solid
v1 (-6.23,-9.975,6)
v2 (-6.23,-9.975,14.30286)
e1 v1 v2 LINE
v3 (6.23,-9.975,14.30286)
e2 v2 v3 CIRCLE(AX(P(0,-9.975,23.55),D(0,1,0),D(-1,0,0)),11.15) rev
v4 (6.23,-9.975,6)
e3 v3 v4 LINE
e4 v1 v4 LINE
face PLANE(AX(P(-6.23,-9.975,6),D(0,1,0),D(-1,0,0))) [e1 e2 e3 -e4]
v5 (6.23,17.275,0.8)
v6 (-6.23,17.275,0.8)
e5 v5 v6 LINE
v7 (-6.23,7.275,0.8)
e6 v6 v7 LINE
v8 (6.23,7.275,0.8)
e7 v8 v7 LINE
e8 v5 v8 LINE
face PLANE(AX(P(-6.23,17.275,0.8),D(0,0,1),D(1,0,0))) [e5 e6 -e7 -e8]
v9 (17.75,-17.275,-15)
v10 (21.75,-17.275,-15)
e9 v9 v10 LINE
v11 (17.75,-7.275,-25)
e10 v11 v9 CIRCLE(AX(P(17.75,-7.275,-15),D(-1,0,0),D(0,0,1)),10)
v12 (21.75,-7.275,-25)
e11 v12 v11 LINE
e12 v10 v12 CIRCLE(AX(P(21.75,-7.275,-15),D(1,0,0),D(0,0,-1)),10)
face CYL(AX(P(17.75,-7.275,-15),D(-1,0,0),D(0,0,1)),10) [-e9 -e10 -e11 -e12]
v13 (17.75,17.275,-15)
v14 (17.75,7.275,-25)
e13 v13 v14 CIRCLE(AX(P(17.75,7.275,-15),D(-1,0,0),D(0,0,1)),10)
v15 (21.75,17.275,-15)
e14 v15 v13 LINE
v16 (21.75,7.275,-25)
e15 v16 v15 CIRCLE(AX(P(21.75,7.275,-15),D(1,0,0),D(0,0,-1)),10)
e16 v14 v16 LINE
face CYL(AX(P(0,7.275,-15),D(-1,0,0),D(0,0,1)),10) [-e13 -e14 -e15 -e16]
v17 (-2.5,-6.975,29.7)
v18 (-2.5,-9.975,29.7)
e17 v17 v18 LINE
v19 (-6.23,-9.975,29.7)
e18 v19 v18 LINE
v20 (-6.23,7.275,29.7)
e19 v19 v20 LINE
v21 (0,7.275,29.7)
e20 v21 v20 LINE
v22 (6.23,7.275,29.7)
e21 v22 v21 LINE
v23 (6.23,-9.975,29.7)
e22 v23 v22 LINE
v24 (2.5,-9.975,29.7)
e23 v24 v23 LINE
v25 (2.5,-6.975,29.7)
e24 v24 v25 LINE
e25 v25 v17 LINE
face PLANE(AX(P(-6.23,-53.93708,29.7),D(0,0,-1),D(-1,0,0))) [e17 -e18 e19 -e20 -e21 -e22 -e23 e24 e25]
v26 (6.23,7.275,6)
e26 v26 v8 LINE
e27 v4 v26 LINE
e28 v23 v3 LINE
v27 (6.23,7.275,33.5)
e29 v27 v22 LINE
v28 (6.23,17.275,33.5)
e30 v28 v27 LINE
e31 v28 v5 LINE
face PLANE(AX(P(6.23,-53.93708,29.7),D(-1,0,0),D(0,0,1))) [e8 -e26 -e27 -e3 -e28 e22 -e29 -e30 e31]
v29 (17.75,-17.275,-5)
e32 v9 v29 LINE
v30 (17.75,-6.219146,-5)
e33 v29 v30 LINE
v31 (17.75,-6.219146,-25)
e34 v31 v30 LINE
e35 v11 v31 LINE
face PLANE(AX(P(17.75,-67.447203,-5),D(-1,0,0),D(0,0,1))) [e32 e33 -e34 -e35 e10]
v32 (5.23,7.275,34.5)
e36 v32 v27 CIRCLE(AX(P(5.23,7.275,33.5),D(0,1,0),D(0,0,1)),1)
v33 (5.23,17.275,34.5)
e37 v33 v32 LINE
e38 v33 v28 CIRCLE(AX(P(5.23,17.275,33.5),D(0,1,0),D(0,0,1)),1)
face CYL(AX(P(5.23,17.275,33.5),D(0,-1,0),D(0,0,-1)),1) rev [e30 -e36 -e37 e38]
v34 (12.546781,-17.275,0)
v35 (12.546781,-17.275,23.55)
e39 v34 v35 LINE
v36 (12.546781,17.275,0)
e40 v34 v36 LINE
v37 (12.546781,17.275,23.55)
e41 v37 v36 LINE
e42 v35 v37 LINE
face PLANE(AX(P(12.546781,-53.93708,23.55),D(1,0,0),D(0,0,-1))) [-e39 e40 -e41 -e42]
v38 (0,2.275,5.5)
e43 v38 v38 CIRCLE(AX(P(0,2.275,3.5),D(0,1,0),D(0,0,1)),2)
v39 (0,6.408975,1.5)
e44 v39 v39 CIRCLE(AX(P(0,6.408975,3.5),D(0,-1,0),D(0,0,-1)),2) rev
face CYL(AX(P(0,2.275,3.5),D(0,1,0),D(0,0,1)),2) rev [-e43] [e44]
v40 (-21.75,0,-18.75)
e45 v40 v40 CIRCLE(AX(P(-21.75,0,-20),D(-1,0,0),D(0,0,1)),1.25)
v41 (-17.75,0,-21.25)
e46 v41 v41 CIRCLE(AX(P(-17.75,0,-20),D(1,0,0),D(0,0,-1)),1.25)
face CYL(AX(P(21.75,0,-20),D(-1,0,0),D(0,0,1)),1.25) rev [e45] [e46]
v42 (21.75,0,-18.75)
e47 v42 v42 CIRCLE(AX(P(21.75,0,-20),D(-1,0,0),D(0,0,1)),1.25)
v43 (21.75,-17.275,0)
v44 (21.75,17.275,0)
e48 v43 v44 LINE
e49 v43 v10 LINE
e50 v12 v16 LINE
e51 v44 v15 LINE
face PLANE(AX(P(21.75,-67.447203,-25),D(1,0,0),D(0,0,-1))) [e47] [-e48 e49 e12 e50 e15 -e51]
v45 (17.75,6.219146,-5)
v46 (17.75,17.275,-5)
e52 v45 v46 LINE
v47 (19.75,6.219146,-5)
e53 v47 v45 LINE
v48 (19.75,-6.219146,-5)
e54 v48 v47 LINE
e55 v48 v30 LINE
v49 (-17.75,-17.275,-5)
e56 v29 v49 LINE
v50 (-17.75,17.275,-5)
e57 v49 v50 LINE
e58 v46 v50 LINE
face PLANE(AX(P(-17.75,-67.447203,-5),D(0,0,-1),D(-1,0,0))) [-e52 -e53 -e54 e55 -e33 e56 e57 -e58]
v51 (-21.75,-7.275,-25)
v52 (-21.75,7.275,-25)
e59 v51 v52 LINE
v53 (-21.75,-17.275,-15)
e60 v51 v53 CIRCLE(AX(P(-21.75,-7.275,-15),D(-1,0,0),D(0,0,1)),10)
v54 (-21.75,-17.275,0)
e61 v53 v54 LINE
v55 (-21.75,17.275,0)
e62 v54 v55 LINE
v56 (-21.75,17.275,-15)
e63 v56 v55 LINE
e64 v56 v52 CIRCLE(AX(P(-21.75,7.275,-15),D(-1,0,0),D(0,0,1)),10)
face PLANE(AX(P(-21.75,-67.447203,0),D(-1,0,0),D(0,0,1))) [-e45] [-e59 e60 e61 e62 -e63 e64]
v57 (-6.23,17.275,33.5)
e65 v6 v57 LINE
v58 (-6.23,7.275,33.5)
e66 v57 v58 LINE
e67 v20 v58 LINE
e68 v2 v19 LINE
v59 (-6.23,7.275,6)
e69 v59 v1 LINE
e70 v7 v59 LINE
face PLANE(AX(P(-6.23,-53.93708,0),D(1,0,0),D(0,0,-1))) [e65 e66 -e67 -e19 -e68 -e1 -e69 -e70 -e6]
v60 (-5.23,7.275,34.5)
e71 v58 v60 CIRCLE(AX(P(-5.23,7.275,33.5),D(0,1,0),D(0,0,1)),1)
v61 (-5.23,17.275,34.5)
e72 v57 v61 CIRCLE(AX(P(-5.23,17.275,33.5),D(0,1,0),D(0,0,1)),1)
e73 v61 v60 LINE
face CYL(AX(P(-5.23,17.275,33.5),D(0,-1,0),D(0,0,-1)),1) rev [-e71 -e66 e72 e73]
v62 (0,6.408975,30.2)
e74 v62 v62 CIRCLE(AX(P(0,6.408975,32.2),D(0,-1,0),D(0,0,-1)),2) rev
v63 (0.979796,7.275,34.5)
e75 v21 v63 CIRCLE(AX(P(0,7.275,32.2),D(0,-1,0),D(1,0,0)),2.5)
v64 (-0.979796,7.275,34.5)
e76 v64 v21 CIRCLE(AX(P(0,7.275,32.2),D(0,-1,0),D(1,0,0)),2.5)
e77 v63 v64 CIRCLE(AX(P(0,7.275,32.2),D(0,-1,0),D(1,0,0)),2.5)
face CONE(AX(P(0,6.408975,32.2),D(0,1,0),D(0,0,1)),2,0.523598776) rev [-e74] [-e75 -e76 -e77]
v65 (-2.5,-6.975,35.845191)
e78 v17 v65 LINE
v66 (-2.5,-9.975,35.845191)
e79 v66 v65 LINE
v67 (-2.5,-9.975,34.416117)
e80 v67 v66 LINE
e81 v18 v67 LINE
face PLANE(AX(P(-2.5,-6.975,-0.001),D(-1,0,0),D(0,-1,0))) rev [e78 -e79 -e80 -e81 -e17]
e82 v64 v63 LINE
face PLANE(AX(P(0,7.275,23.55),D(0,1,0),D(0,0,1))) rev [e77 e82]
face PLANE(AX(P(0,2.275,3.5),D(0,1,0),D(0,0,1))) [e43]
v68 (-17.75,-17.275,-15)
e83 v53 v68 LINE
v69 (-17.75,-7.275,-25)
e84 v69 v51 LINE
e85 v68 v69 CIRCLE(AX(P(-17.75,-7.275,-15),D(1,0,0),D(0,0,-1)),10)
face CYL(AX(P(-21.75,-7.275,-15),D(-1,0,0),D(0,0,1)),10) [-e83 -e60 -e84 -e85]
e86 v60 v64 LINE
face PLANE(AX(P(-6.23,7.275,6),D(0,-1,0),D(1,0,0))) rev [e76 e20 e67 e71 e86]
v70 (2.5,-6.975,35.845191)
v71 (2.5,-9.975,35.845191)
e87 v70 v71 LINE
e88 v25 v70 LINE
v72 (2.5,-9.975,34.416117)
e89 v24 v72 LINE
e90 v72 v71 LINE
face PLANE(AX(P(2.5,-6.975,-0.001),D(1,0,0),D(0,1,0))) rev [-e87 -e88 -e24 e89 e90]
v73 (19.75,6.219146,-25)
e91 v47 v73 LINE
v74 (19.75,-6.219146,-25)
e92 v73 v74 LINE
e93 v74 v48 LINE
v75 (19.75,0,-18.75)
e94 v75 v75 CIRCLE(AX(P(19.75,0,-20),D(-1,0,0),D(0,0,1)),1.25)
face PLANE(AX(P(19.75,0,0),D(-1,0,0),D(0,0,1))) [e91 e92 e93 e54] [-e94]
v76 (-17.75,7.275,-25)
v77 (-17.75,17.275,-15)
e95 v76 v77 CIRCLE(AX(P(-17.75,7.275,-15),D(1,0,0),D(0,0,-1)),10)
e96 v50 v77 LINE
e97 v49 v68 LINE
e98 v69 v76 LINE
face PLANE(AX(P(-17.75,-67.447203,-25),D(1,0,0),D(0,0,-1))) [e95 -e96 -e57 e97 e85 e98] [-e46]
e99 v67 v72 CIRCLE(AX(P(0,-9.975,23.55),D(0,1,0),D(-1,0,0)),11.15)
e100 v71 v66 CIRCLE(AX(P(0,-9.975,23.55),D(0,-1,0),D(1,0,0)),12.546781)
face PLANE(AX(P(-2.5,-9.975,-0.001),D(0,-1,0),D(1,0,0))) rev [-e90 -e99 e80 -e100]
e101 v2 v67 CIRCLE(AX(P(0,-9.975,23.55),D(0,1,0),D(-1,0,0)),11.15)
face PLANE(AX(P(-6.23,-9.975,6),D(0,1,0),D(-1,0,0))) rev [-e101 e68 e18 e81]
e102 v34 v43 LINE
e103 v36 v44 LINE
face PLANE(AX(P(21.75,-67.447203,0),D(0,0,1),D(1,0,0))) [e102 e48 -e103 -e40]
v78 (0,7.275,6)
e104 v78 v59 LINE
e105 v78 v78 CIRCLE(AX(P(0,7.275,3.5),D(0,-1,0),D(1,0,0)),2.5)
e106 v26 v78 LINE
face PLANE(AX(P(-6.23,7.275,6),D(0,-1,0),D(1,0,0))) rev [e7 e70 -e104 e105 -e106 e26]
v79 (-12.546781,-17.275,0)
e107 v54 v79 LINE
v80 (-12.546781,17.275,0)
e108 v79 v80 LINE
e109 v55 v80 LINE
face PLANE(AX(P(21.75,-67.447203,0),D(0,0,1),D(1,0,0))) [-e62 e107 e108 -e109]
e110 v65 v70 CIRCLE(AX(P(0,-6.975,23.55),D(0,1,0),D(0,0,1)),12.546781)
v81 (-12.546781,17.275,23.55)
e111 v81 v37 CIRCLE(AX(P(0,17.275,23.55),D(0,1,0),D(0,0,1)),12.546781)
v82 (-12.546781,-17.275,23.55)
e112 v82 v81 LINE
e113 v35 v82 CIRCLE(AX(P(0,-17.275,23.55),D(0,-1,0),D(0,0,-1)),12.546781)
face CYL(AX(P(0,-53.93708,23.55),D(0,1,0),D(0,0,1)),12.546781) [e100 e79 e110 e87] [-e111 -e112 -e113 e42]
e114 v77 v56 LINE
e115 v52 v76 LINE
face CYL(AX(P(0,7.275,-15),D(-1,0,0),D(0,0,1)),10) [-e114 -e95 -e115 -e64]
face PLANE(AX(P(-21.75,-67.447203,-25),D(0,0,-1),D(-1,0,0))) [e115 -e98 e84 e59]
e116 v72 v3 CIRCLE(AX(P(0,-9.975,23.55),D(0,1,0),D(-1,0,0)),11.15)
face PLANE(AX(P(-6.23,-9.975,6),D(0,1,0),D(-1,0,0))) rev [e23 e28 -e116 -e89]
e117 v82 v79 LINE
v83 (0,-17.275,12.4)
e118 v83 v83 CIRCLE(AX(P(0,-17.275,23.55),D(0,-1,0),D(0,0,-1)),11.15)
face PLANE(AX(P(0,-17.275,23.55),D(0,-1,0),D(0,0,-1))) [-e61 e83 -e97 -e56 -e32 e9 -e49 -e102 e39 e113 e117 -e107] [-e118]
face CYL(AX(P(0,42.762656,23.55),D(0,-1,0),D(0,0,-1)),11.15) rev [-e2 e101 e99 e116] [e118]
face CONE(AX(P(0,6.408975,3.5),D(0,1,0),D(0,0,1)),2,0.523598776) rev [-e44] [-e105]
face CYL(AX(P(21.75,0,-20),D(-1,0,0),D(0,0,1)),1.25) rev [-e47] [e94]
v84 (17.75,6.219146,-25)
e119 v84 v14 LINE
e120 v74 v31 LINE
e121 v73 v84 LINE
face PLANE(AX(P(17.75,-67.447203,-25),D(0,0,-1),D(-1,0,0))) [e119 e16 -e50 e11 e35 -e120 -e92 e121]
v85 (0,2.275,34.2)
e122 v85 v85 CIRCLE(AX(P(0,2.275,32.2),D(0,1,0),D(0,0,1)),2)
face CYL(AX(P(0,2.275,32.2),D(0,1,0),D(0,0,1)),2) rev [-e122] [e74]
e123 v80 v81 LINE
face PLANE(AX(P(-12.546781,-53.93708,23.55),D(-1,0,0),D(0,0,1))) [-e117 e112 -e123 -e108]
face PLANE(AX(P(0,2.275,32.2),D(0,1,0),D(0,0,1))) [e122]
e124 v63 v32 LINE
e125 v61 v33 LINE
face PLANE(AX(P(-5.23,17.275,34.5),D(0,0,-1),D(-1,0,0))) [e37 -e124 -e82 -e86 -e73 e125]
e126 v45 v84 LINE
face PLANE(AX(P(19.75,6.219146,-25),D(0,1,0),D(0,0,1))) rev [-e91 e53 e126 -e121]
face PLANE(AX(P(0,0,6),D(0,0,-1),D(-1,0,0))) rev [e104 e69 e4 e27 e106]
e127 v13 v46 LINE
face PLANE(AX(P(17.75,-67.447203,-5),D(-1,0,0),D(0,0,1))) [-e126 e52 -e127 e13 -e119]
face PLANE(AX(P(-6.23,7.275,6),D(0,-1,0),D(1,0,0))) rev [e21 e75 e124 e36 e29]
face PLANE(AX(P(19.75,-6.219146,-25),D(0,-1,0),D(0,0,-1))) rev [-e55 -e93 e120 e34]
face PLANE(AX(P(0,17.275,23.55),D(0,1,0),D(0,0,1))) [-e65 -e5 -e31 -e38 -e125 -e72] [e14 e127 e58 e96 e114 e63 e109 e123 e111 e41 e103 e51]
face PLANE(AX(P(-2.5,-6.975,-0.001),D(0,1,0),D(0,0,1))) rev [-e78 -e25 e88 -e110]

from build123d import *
from OCP.BRepFilletAPI import BRepFilletAPI_MakeChamfer

# Parameters (mm, degrees)
SKETCH4_W                = 12.46
SKETCH4_H                = 17.25
BOSS_EXTRUDE3_DEPTH      = 6
BOSS_EXTRUDE6_DEPTH      = 7.3
BOSS_EXTRUDE6_DEPTH_BACK = 17.25
SKETCH8_R                = 12.546781182
SKETCH8_R_2              = 11.15
BOSS_EXTRUDE4_DEPTH      = 17.25
SKETCH6_R                = 2
CUT_EXTRUDE1_DEPTH       = 5
CHAMFER1_SIZE            = 0.5
CHAMFER1_SIZE_2          = 0.866025404
SKETCH10_W               = 12.46
SKETCH10_H               = 23.7
CUT_EXTRUDE3_DEPTH       = 17.25
CUT_EXTRUDE4_REACH       = 43.938
SKETCH11_W               = 5
SKETCH11_H               = 3
BOSS_EXTRUDE7_START      = -7.3
BOSS_EXTRUDE7_DEPTH      = 7.3
BOSS_EXTRUDE9_START      = 10
BOSS_EXTRUDE9_DEPTH      = 10
BOSS_EXTRUDE10_DEPTH     = 34.55
SKETCH18_W               = 20
SKETCH18_H               = 12.438292938
CUT_EXTRUDE5_DEPTH       = 2
CUT_EXTRUDE6_DEPTH       = 58.651133872
CUT_EXTRUDE6_DEPTH_BACK  = 58.651133872
SKETCH19_R               = 1.25
FILLET1_R                = 10


with BuildPart() as part:
    # Sketch4 → Boss-Extrude3 (new body)
    with BuildSketch(Plane.XY):
        with Locations((0, -1.35)):
            Rectangle(SKETCH4_W, SKETCH4_H)
    extrude(amount=BOSS_EXTRUDE3_DEPTH)



with BuildPart() as body_2:
    # Sketch8 → Boss-Extrude6 (new, two sides: drawn at the far end of the back side and taken through both)
    with BuildSketch(Plane(origin=(0, -9.975, 0), x_dir=(-1, 0, 0), z_dir=(0, -1, 0)).offset(-BOSS_EXTRUDE6_DEPTH_BACK)):
        with Locations(Location((0, -23.55, 0), (0, 0, 90))):
            Circle(SKETCH8_R)
        with Locations(Location((0, -23.55, 0), (0, 0, 90))):
            Circle(SKETCH8_R_2, mode=Mode.SUBTRACT)
    extrude(amount=BOSS_EXTRUDE6_DEPTH + BOSS_EXTRUDE6_DEPTH_BACK)


with BuildPart() as part_1:
    add(part.part)

    add(body_2.part)  # Boss-Extrude4 merges body 2
    # Sketch5 → Boss-Extrude4 (add)
    with BuildSketch(Plane(origin=(0, 7.275, 0), x_dir=(1, 0, 0), z_dir=(0, 1, 0))):
        with BuildLine():
            Line((12.546781182, -23.55), (12.546781182, 0))
            Line((12.546781182, 0), (6.23, 0))
            Line((6.23, 0), (6.23, -29.7))
            Line((6.23, -29.7), (-6.23, -29.7))
            Line((-6.23, -29.7), (-6.23, 0))
            Line((-6.23, 0), (-12.546781182, 0))
            Line((-12.546781182, 0), (-12.546781182, -23.55))
            ThreePointArc((-12.546781182, -23.55), (0, -36.096781182), (12.546781182, -23.55))
        make_face()
    extrude(amount=-BOSS_EXTRUDE4_DEPTH)

    # Sketch6 → Cut-Extrude1 (cut)
    with BuildSketch(Plane(origin=(0, 7.275, 0), x_dir=(1, 0, 0), z_dir=(0, 1, 0))):
        with Locations(Location((0, -3.5, 0), (0, 0, 270))):
            Circle(SKETCH6_R)
        with Locations(Location((0, -32.2, 0), (0, 0, 270))):
            Circle(SKETCH6_R)
    extrude(amount=-CUT_EXTRUDE1_DEPTH, mode=Mode.SUBTRACT)

    # Chamfer1
    chamfer1_edges_1 = [part_1.edges().sort_by_distance(p)[0] for p in [
        (0, 7.275, 1.5),
    ]]
    chamfer1_side_1 = [part_1.faces().sort_by_distance(p)[0] for p in [
        (0, 7.275, 1.49),
    ]]
    chamfer1_edges_2 = [part_1.edges().sort_by_distance(p)[0] for p in [
        (0, 7.275, 30.2),
    ]]
    chamfer1_side_2 = [part_1.faces().sort_by_distance(p)[0] for p in [
        (0, 7.275, 30.19),
    ]]
    chamfer1 = BRepFilletAPI_MakeChamfer(part_1.part.solid().wrapped)
    for e in chamfer1_edges_1:
        chamfer1.Add(CHAMFER1_SIZE - 0.0001, CHAMFER1_SIZE_2 - 0.0001, e.wrapped, chamfer1_side_1[0].wrapped)
    for e in chamfer1_edges_2:
        chamfer1.Add(CHAMFER1_SIZE - 0.0001, CHAMFER1_SIZE_2 - 0.0001, e.wrapped, chamfer1_side_2[0].wrapped)
    add(Compound.cast(chamfer1.Shape()), mode=Mode.REPLACE)  # a hair under: the kernel refuses the full size

    # Sketch10 → Cut-Extrude3 (cut)
    with BuildSketch(Plane(origin=(0, 7.275, 0), x_dir=(1, 0, 0), z_dir=(0, 1, 0))):
        with Locations((0, -17.85)):
            Rectangle(SKETCH10_W, SKETCH10_H)
    extrude(amount=-CUT_EXTRUDE3_DEPTH, mode=Mode.SUBTRACT)

    # Sketch11 → Cut-Extrude4 (cut, up to next)
    with BuildSketch(Plane.XY.offset(36.096781182), mode=Mode.PRIVATE) as cut_extrude4_sk1:
        with Locations((0, -8.475)):
            Rectangle(SKETCH11_W, SKETCH11_H)
    cut_extrude4_tool1 = extrude(cut_extrude4_sk1.sketch, amount=-CUT_EXTRUDE4_REACH, mode=Mode.PRIVATE) & part_1.part
    add(cut_extrude4_tool1.solids().sort_by_distance((0, -8.475, 36.096781))[0], mode=Mode.SUBTRACT)

    # Sketch13 → Boss-Extrude7 (add)
    with BuildSketch(Plane.XZ.offset(17.275).offset(BOSS_EXTRUDE7_START)):
        with BuildLine():
            Line((-12.546781182, 23.55), (-12.546781182, 0))
            Line((-12.546781182, 0), (12.546781182, 0))
            Line((12.546781182, 0), (12.546781182, 23.55))
            ThreePointArc((12.546781182, 23.55), (0, 11.003218818), (-12.546781182, 23.55))
        make_face()
    extrude(amount=BOSS_EXTRUDE7_DEPTH)

    # Sketch15 → Boss-Extrude9 (add)
    with BuildSketch(Plane(origin=(0, 7.275, 0), x_dir=(1, 0, 0), z_dir=(0, 1, 0)).offset(BOSS_EXTRUDE9_START)):
        with BuildLine():
            Line((-12.546781182, 0), (12.546781182, 0))
            Line((12.546781182, 0), (12.546781182, -23.55))
            ThreePointArc((12.546781182, -23.55), (0, -36.096781182), (-12.546781182, -23.55))
            Line((-12.546781182, -23.55), (-12.546781182, 0))
        make_face()
        with BuildLine():
            Line((-6.23, -0.8), (6.23, -0.8))
            Line((6.23, -0.8), (6.23, -33.5))
            ThreePointArc((6.23, -33.5), (5.937106781, -34.207106781), (5.23, -34.5))
            Line((5.23, -34.5), (-5.23, -34.5))
            ThreePointArc((-5.23, -34.5), (-5.937106781, -34.207106781), (-6.23, -33.5))
            Line((-6.23, -33.5), (-6.23, -0.8))
        make_face(mode=Mode.SUBTRACT)
    extrude(amount=-BOSS_EXTRUDE9_DEPTH)

    # Sketch17 → Boss-Extrude10 (add)
    with BuildSketch(Plane(origin=(0, 17.275, 0), x_dir=(1, 0, 0), z_dir=(0, 1, 0))):
        Polygon((21.75, 25), (21.75, 0), (-21.75, 0), (-21.75, 25), (-17.75, 25), (-17.75, 5), (17.75, 5), (17.75, 25), align=None)
    extrude(amount=-BOSS_EXTRUDE10_DEPTH)

    # Sketch18 → Cut-Extrude5 (cut)
    with BuildSketch(Plane.ZY.offset(-17.75)):
        with Locations((-15, 0)):
            Rectangle(SKETCH18_W, SKETCH18_H)
    extrude(amount=-CUT_EXTRUDE5_DEPTH, mode=Mode.SUBTRACT)

    # Sketch19 → Cut-Extrude6 (cut, two sides: drawn at the far end of the back side and taken through both)
    with BuildSketch(Plane.ZY.offset(-19.75).offset(-CUT_EXTRUDE6_DEPTH_BACK)):
        with Locations((-20, 0)):
            Circle(SKETCH19_R)
    extrude(amount=CUT_EXTRUDE6_DEPTH + CUT_EXTRUDE6_DEPTH_BACK, mode=Mode.SUBTRACT)

    # Fillet1
    fillet1_edges = [part_1.edges().sort_by_distance(p)[0] for p in [
        (19.75, 17.275, -25),
        (-19.75, 17.275, -25),
        (-19.75, -17.275, -25),
        (19.75, -17.275, -25),
    ]]
    fillet(fillet1_edges, radius=FILLET1_R)


solid = part_1.part
